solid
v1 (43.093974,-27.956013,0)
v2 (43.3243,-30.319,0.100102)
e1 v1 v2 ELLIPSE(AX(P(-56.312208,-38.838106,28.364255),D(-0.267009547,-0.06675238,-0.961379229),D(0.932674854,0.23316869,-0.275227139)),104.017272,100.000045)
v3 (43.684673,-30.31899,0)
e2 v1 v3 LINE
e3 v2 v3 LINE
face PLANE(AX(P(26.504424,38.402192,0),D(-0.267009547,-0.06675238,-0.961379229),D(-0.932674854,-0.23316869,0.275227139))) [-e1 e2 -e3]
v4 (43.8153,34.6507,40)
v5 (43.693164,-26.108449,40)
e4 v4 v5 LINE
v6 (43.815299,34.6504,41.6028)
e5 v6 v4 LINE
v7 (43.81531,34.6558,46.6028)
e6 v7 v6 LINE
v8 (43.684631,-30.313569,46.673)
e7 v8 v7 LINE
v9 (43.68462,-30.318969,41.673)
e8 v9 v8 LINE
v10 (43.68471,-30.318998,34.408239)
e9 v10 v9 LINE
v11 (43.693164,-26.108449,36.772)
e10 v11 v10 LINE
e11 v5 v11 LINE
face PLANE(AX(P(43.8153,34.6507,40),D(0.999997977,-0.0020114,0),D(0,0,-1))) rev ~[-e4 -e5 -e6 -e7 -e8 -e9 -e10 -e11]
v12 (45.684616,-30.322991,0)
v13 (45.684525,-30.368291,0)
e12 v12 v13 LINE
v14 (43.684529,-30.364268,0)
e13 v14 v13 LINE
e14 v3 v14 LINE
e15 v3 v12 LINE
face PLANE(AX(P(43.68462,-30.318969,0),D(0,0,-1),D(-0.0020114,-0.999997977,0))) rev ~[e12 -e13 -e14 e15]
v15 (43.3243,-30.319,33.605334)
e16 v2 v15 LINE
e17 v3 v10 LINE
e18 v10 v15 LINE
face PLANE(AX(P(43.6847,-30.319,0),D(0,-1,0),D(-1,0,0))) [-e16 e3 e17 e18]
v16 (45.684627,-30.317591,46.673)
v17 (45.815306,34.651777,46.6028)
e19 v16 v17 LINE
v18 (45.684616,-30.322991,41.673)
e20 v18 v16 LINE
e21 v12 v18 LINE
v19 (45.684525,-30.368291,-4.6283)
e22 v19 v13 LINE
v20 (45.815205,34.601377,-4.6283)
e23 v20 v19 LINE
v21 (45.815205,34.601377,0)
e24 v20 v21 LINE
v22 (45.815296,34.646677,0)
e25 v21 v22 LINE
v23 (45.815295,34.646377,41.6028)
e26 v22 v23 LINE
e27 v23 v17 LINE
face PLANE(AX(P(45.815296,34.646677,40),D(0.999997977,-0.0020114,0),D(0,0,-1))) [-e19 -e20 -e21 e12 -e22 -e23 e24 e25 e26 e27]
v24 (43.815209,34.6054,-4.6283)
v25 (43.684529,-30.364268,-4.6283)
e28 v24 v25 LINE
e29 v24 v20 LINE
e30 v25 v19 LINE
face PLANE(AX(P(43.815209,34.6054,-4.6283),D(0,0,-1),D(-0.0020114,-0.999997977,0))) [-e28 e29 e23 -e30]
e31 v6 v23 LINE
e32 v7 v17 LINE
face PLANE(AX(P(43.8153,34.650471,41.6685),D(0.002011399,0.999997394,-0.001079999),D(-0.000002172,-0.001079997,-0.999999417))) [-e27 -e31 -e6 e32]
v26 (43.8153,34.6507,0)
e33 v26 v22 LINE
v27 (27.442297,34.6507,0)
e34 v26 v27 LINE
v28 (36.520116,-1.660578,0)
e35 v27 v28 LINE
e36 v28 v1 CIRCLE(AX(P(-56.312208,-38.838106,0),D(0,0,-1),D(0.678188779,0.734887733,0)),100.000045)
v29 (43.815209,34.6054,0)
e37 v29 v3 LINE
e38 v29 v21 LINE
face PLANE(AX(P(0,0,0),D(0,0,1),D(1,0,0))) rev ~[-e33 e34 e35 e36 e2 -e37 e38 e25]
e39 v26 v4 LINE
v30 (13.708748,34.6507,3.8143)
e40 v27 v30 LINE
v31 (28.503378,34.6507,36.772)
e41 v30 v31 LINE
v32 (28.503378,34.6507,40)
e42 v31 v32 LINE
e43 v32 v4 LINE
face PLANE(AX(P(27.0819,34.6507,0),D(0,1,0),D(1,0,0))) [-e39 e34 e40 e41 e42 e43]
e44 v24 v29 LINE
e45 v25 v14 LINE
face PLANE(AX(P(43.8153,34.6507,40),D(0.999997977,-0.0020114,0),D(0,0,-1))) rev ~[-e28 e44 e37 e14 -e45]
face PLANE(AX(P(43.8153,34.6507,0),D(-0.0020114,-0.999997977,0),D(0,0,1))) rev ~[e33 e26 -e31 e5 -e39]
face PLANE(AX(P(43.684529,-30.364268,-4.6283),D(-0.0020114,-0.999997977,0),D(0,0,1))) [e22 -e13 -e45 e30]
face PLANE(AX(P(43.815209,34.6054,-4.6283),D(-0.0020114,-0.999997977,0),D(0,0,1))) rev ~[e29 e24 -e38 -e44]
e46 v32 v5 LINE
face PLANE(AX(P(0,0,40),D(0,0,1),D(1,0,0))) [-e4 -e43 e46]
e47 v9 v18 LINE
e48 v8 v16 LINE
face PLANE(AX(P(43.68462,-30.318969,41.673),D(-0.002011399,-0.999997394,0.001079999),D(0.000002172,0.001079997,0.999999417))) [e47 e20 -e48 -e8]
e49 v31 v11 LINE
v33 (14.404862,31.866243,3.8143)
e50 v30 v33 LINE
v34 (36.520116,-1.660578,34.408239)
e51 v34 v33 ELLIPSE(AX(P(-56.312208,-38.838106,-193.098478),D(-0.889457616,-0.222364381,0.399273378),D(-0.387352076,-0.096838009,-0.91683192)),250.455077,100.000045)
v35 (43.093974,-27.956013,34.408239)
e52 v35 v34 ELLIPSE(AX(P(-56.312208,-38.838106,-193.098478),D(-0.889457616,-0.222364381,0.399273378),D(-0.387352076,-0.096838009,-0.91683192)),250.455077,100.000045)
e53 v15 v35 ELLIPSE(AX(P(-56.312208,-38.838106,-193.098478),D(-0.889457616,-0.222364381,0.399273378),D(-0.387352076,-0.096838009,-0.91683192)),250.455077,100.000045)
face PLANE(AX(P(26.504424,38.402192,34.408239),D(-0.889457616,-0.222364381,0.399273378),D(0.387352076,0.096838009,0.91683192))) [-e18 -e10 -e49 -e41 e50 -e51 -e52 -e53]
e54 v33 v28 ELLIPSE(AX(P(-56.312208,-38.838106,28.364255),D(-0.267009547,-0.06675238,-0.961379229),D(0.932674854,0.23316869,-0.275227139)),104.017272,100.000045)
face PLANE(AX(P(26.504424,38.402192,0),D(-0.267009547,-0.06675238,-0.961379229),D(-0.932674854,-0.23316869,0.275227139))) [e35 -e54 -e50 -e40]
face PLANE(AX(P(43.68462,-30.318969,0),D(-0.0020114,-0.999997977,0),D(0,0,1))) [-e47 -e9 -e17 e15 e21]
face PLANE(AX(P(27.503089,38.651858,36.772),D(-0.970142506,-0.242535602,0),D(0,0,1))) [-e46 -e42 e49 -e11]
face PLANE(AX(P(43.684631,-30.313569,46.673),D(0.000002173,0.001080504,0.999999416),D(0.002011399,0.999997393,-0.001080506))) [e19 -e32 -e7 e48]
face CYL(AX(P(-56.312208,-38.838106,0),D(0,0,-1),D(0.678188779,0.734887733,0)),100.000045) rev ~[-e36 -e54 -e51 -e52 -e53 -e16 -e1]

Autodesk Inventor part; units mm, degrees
ref_plane "YZ Plane" through (0, 0, 0) normal (1, 0, 0) x (0, 1, 0)
ref_plane "XZ Plane" through (0, 0, 0) normal (0, 1, 0) x (-1, 0, 0)
sketch "Sketch1" plane through (0, 0, 0) normal (0, 0, 1) x (1, 0, 0)
  line L0 (43.3243, -30.319) -> (27.0819, 34.6507)
  line L1 (43.6847, -30.319) -> (43.3243, -30.319)
  line L2 (43.8153, 34.6507) -> (43.6847, -30.319)
  line L3 (27.0819, 34.6507) -> (43.8153, 34.6507)
  point P0 (0, 0)
extrude "Extrusion1" add sketch "Sketch1" along normal blind 40
sketch "Sketch2" plane through (0, 0, 40) normal (0, 0, 1) x (1, 0, 0)
  line L0 (43.6847, -30.319) -> (43.8153, 34.6507)
  line L1 (43.8153, 34.6507) -> (27.0819, 34.6507)
  line L2 (27.0819, 34.6507) -> (43.3243, -30.319)
  line L3 (43.3243, -30.319) -> (43.6847, -30.319)
  line L4 (9.5067, 30.2569) -> (11.5067, 30.2569)
  line L5 (11.5067, 30.2569) -> (11.5067, 34.6507)
  line L6 (11.5067, 34.6507) -> (27.0819, 34.6507)
  line L7 (11.5067, 34.6507) -> (43.3243, -30.319)
  point P0 (0, 0)
  dimension "d2" = 2
extrude "Extrusion2" add sketch "Sketch2" against normal blind 40 contours L7 L6 L2
sketch "Sketch3" plane through (0, 0, 0) normal (0, 0, -1) x (-1, 0, 0)
  line L0 (-43.6847, -30.319) -> (-43.8153, 34.6507) projected
  line L1 (-43.3243, -30.319) -> (-43.6847, -30.319) projected
  line L2 (-43.3243, -30.319) -> (-11.5067, 34.6507) projected
  line L3 (-43.8153, 34.6507) -> (-11.5067, 34.6507) projected
  arc A0 (-11.5067, 34.6507) -> (-43.3243, -30.319) centre (56.3122, -38.8381) ccw
  point P0 (0, 0)
  dimension "d5" = 100
extrude "Extrusion3" cut sketch "Sketch3" against normal blind 40 contours A0 L2
ref_plane "Work Plane1" through (25.8481, -31.3143, 21.5224) normal (0.9701425, 0.2425356, 0) x (0, 0, -1)
ref_plane "Work Plane4" through (11.5067, 34.6507, 40) normal (0.2425356, -0.9701425, 0) x (0, 0, -1)
ref_plane "Work Plane3" through (25.8481, -31.3143, 21.5224) normal (0.9701425, 0.2425356, 0) x (0, 0, -1)
sketch "Sketch5" plane through (11.5067, 34.6507, 40) normal (0.2425356, -0.9701425, 0) x (0, 0, -1)
  line L0 (29.9641, 1.0219) -> (3.228, 13.4892)
  line L1 (3.228, 13.4892) -> (3.228, 16.4892)
  line L2 (3.228, 16.4892) -> (0, 16.4892)
  line L3 (0, 31.344) -> (0, 0) projected
  line L4 (40, 31.344) -> (40, 0) projected
  line L5 (0, 0) -> (40, 0) projected
  line L6 (0, 31.344) -> (0, 0) projected
  line L7 (40, 31.344) -> (0, 31.344) projected
  line L8 (29.9641, 1.0219) -> (40, 1.0219)
  arc A0 (36.6954, 1.9144) -> (36.6283, 1.4007) centre (38.6283, 1.4007) ccw projected
  line L9 (36.6954, 1.9144) -> (40, 1.9144) projected
  line L10 (40, 1.9144) -> (40, -5.9625) projected
  arc A1 (40, -5.9625) -> (38.4823, -3.5717) centre (32.6454, -8.9542) ccw projected
  arc A2 (36.6283, 1.1737) -> (38.4823, -3.5717) centre (43.6283, 1.1737) ccw projected
  line L11 (36.6283, 1.1737) -> (36.6283, 1.4007) projected
  arc A3 (36.867, 2.3482) -> (36.6954, 1.9144) centre (38.6283, 1.4007) ccw projected
  arc A4 (36.867, 2.3482) -> (40, 14.7848) centre (13.75, 14.7848) ccw projected
  line L12 (40, 14.7848) -> (40, 31.0187) projected
  line L13 (44.6283, 31.0187) -> (40, 31.0187) projected
  line L14 (44.6283, -24.8913) -> (44.6283, 31.0187) projected
  line L15 (44.6283, -24.8913) -> (40, -24.8913) projected
  line L16 (40, -24.8913) -> (40, 1.9144) projected
  line L17 (36.6954, 1.9144) -> (40, 1.9144) projected
  line L18 (36.6954, 1.9144) -> (3.228, 16.4892)
  line L19 (40, 15.4598) -> (40, 31.344) projected
  line L20 (40, 14.7848) -> (40, 15.4598)
  line L21 (40, 15.4598) -> (0, 15.4598) projected
  line L22 (40, 15.4598) -> (36.1857, 2.1363)
  point P0 (40, -19.5671)
  point P1 (0, 0)
  point P2 (36.7274, 0)
  dimension "d10" = 3
extrude "Extrusion4" cut sketch "Sketch5" along normal blind 72.5 contours L8 A2 L5 L3 L21 L1 L0 | L0 L1 L21 L18 A0 L11 A2 L8 | A2 L11 A0 L9 L4 L8 | L8 L4 L5 A2 | L21 L3 L2 L1 | L1 L18 L21 | L5 L10 A1 A2 | L9 A3 A4 L4 | L22 L4 A4 A3 L18
sketch "Sketch6" plane through (43.8153, 34.6507, 40) normal (0.999998, -0.0020114, 0) x (0, 0, -1)
  line L0 (40, -0.0453) -> (40, -65.0151)
  line L1 (44.6283, -65.0151) -> (40, -65.0151)
  line L2 (44.6283, -0.0453) -> (44.6283, -65.0151)
  line L3 (44.6283, -0.0453) -> (40, -0.0453)
  line L4 (-1.673, -64.9698) -> (-6.673, -64.9644)
  line L5 (-1.673, -64.9698) -> (-1.6028, -0.0003)
  line L6 (-6.6028, 0.0051) -> (-1.6028, -0.0003)
  line L7 (-6.673, -64.9644) -> (-6.6028, 0.0051)
  line L8 (0, -60.7594) -> (0, 0) projected
  line L9 (0, 0) -> (-1.6685, 0)
  line L10 (-1.6685, 0) -> (-1.6685, -60.7144)
  line L11 (-1.6685, -60.7144) -> (0, -60.7144)
  line L12 (0, -60.7144) -> (0, 0)
  line L13 (40, -64.9698) -> (40, 0) projected
  line L14 (40, 0) -> (0, 0)
  line L15 (0, 0) -> (0, -60.7144)
  line L16 (0, -60.7144) -> (40, -60.7144)
  line L17 (40, -60.7144) -> (40, 0)
  line L18 (40, -64.9698) -> (-1.673, -64.9698)
  point P0 (40, -34.7388)
  point P1 (-1.6685, -0.0002)
  point P2 (40, -60.7144)
extrude "Extrusion5" add sketch "Sketch6" along normal blind 2
properties part number "Lid"
